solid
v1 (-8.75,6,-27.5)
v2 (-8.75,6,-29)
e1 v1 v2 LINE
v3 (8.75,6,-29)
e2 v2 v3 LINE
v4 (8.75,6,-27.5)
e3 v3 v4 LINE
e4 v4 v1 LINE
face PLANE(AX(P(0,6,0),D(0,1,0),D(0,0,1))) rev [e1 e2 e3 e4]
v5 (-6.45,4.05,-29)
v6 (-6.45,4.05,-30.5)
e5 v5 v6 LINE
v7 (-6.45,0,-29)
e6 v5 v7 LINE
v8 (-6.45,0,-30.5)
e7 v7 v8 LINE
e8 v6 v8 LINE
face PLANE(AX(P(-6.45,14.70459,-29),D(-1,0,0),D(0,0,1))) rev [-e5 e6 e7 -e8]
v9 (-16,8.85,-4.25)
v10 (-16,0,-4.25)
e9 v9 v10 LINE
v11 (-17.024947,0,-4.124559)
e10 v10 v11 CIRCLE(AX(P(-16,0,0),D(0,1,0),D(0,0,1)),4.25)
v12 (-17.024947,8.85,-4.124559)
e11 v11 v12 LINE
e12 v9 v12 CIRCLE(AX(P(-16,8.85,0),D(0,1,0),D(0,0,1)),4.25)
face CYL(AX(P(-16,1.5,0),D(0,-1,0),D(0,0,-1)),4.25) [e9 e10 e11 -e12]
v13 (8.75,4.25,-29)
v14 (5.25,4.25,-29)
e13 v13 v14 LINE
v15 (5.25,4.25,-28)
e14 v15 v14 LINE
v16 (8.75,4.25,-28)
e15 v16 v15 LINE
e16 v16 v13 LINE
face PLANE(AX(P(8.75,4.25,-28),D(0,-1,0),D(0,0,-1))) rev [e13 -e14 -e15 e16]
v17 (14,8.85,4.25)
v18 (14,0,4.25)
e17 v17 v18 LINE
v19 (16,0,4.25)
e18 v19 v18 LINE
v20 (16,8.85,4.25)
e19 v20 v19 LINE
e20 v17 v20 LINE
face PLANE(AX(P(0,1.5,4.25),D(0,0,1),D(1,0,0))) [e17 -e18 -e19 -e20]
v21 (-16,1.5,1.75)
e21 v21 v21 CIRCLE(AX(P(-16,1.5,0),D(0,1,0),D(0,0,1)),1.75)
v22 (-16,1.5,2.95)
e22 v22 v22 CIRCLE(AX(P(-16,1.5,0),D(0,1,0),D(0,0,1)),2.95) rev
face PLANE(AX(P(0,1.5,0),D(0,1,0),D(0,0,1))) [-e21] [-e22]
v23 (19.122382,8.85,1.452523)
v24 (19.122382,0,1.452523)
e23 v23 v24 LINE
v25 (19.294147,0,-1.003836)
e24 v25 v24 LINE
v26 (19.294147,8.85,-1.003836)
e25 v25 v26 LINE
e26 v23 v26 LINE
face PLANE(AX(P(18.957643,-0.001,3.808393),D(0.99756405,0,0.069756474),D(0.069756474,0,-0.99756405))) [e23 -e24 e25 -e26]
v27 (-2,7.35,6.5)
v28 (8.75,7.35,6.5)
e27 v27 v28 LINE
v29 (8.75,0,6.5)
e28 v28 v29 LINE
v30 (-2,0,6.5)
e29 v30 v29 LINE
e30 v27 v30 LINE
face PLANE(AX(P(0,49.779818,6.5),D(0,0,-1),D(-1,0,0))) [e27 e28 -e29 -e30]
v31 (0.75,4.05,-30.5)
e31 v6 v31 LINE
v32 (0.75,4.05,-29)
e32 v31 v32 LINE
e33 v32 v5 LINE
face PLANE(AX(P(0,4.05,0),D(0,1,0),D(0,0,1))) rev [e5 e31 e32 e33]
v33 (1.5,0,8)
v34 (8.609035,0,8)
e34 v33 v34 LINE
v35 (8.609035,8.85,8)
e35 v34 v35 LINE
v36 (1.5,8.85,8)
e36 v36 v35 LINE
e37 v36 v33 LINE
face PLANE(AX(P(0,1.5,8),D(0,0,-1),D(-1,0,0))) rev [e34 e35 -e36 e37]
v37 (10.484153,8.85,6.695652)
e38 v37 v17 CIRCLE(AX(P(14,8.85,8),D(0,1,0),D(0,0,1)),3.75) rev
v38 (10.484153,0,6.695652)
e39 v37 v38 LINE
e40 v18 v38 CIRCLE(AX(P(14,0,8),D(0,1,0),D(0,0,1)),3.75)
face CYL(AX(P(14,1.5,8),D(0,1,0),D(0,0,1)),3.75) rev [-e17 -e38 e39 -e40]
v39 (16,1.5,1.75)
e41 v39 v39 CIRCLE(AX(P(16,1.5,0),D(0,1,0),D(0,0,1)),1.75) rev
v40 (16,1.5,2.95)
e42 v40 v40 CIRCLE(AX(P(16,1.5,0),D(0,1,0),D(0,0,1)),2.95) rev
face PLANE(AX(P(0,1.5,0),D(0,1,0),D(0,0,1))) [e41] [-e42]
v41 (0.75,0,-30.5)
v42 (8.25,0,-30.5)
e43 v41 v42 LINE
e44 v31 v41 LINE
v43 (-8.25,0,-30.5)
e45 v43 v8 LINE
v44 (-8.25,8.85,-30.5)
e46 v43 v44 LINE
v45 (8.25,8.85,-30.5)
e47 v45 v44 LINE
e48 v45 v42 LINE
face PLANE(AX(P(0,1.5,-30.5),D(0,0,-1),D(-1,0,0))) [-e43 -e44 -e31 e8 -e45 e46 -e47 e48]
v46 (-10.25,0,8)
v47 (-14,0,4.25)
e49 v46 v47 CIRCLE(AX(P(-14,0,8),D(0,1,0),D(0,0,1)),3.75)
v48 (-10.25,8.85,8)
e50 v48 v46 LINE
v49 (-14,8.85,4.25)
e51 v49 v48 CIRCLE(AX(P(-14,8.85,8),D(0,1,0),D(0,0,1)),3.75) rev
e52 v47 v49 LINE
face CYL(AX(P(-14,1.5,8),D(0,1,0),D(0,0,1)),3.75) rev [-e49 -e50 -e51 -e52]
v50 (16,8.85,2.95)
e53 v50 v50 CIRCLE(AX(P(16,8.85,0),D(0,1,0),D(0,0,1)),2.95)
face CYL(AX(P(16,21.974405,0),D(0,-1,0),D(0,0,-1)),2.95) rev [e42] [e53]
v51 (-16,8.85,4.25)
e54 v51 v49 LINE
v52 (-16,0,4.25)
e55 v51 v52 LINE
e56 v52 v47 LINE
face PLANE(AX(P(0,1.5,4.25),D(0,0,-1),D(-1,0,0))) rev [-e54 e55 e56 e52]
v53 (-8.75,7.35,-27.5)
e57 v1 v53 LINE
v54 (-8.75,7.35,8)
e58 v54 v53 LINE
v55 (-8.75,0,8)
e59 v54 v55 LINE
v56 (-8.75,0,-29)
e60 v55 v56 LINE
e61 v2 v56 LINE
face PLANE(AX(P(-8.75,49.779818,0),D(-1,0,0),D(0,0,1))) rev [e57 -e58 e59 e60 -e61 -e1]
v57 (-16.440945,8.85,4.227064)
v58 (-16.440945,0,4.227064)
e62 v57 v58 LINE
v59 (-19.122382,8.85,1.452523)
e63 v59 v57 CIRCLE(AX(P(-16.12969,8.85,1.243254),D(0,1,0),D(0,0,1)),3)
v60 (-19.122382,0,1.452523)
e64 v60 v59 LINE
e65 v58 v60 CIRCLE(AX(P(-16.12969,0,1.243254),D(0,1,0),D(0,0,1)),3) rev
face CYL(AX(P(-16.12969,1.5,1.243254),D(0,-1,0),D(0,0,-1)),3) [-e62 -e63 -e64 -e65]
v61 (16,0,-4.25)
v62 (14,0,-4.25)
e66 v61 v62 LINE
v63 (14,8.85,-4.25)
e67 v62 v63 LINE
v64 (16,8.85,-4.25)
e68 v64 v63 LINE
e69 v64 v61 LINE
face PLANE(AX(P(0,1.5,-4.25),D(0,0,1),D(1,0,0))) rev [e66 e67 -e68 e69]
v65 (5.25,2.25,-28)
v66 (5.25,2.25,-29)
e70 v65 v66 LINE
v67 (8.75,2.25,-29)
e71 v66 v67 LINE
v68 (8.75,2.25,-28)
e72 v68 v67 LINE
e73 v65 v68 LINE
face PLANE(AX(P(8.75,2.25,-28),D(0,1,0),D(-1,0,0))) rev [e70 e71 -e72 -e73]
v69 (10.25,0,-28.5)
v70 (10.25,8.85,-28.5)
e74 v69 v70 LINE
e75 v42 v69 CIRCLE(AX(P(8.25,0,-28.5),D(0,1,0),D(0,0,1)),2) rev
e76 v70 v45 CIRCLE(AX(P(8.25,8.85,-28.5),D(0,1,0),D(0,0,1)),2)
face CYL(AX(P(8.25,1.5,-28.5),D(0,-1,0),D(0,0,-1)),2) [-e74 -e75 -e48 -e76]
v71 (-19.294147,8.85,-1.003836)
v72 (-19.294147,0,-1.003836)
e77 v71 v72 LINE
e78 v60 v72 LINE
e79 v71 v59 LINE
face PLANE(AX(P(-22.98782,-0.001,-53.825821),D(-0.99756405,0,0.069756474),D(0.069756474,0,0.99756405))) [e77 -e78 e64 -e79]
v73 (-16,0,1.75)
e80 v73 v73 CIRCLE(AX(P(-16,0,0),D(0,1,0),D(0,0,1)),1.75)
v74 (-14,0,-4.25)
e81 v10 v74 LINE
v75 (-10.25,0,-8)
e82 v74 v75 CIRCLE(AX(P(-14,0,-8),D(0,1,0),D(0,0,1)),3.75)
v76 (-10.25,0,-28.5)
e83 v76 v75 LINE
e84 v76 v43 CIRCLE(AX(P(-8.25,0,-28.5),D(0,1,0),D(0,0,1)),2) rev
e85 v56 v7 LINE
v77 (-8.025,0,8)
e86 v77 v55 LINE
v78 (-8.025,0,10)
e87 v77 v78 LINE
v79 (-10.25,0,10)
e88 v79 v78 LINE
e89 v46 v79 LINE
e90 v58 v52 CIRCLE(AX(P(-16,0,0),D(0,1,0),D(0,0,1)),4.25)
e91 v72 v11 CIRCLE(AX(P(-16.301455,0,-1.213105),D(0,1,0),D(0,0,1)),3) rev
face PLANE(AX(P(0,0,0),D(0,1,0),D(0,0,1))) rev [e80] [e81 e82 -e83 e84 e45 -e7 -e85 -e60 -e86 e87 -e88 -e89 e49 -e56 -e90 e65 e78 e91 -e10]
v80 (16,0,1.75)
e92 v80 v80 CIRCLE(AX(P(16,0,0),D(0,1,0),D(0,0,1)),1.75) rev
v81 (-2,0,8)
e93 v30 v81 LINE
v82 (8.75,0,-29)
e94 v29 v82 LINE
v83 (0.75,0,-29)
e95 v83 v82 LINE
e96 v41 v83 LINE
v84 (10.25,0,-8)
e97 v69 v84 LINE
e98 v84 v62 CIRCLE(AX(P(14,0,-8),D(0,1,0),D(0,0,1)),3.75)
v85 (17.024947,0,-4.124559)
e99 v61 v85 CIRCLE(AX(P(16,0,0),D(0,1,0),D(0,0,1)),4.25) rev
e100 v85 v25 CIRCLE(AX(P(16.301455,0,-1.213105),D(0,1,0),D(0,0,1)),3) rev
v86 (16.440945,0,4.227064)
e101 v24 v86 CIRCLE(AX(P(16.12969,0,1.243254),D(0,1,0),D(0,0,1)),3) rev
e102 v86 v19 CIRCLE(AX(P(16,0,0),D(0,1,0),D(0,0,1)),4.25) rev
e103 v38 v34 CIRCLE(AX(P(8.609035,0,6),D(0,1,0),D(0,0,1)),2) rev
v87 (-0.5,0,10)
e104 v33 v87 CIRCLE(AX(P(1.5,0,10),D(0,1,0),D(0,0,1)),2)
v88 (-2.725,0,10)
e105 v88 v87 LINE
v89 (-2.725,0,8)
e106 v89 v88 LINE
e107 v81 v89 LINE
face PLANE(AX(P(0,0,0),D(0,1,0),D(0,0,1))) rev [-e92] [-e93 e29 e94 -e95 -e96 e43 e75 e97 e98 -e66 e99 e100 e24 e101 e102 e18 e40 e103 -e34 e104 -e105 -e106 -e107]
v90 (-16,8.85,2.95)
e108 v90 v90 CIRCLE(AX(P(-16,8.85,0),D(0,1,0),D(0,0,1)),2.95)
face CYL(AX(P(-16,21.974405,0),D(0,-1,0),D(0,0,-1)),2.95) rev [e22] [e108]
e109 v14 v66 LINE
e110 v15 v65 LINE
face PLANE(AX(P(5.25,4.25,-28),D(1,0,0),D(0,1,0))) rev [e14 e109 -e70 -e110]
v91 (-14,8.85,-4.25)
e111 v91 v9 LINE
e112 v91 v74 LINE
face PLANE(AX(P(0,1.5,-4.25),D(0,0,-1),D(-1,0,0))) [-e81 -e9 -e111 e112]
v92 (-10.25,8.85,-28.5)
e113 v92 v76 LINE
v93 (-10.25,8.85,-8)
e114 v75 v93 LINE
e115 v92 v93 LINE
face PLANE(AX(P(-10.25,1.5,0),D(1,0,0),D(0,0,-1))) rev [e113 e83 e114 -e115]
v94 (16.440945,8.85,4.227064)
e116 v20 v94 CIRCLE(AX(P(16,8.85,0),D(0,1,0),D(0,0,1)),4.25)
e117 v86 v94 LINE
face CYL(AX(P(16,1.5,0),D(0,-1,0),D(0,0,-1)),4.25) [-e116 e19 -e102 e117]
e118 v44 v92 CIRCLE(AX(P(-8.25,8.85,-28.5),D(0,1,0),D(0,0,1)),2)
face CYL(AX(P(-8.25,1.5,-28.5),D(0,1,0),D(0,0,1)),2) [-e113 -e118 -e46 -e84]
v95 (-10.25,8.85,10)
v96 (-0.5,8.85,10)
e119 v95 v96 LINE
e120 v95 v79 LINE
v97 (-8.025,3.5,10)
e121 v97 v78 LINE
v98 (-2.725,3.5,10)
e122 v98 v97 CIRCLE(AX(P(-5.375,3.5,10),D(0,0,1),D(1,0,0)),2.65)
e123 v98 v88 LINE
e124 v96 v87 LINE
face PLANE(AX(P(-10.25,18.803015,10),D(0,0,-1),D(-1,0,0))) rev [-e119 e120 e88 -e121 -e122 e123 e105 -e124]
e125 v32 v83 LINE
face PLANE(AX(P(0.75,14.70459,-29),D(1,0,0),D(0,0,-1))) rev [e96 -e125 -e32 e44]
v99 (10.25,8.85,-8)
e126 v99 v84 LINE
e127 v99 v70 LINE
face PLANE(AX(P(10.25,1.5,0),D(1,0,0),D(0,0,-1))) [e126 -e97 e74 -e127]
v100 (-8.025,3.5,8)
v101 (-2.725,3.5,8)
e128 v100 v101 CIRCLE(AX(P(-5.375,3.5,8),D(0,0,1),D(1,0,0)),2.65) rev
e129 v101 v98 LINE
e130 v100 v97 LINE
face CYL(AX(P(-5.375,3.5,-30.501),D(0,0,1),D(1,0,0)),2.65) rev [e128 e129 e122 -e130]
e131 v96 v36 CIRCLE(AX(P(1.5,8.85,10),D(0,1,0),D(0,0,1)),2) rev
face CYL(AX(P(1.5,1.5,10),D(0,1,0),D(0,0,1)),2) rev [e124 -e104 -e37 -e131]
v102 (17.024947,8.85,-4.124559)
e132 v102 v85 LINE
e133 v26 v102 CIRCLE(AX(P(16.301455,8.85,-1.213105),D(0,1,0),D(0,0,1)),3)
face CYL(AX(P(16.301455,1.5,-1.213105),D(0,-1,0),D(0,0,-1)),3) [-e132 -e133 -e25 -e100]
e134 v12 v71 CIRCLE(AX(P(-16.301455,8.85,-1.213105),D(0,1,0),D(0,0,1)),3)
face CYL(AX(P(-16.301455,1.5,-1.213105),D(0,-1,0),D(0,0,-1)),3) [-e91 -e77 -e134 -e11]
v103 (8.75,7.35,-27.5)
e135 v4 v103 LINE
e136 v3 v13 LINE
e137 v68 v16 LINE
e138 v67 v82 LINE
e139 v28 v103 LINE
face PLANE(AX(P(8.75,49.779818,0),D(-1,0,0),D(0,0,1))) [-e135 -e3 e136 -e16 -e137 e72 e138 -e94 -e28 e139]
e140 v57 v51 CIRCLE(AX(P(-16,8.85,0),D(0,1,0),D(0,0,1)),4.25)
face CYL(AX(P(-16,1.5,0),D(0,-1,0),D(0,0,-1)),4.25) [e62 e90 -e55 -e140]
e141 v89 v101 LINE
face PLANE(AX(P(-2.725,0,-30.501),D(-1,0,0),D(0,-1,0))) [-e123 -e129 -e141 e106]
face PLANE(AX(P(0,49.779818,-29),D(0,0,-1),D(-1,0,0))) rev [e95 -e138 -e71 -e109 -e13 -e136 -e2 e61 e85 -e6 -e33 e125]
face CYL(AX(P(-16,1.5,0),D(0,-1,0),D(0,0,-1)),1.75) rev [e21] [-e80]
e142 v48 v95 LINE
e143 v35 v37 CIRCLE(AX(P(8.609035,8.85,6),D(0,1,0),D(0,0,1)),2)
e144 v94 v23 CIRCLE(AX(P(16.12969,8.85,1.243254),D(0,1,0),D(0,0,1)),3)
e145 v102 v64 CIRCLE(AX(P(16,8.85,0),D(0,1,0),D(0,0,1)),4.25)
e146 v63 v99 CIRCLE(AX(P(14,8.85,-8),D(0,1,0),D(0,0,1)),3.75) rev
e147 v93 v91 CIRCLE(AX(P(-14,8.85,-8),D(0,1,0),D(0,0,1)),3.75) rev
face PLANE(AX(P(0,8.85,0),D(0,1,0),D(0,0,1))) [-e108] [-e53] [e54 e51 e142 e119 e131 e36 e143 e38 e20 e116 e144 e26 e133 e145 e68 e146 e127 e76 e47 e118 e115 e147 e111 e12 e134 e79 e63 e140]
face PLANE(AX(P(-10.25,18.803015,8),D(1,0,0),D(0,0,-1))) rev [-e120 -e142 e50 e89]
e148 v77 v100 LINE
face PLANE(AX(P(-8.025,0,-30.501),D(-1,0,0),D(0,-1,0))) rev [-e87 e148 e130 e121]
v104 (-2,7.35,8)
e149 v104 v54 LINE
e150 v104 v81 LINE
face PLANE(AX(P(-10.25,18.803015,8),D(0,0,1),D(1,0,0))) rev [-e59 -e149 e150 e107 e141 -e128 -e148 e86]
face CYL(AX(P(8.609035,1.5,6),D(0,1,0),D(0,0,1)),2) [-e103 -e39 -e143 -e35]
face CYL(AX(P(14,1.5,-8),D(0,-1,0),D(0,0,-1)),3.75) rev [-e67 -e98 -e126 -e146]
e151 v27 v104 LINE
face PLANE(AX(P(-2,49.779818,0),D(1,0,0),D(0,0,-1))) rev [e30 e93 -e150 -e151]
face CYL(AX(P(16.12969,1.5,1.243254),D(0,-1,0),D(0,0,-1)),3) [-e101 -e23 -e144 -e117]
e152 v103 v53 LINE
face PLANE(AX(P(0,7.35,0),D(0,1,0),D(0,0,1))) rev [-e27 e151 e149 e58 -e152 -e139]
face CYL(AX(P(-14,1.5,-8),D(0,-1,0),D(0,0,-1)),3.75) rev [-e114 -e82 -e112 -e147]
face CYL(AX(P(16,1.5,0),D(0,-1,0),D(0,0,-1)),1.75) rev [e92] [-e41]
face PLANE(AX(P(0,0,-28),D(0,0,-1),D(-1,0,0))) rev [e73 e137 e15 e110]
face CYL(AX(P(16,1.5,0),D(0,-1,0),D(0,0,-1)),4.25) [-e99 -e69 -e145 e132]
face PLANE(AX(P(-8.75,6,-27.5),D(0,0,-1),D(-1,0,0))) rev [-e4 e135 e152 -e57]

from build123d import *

# Parameters (mm, degrees)
SKETCH1_W           = 20.5
SKETCH1_H           = 38.5
SKETCH1_R           = 4.25
SKETCH1_R_2         = 1.75
BOSS_EXTRUDE1_DEPTH = 1.5
SKETCH2_W           = 20.5
SKETCH2_H           = 38.5
BOSS_EXTRUDE2_DEPTH = 7.35
SKETCH3_W           = 17.5
SKETCH3_H           = 35.5
SKETCH3_W_2         = 6.75
SKETCH3_H_2         = 1.5
CUT_EXTRUDE1_DEPTH  = 7.35
SKETCH4_W           = 7.2
SKETCH4_H           = 1.5
CUT_EXTRUDE2_DEPTH  = 4.05
SKETCH6_W           = 17.5
SKETCH6_H           = 1.5
BOSS_EXTRUDE3_DEPTH = 1.35
SKETCH7_W           = 3.5
SKETCH7_H           = 2
BOSS_EXTRUDE4_DEPTH = 1
SKETCH8_R           = 2.95
BOSS_EXTRUDE5_DEPTH = 7.35
FILLET2_R           = 3.75
CUT_EXTRUDE4_START  = -8.85
CUT_EXTRUDE4_DEPTH  = 8.85
FILLET5_R           = 3
SKETCH10_W          = 9.75
SKETCH10_H          = 2
BOSS_EXTRUDE6_DEPTH = 8.85
CUT_EXTRUDE5_REACH  = 47.729
FILLET4_R           = 2


with BuildPart() as part:
    # Sketch1 → Boss-Extrude1 (new body)
    # profile 1 of 5: a face of its own
    with BuildSketch(Plane(origin=(0, 0, 0), x_dir=(1, 0, 0), z_dir=(0, 1, 0))):
        with Locations((0, 11.25)):
            Rectangle(SKETCH1_W, SKETCH1_H)
    # profile 2 of 5: a face of its own
    with BuildSketch(Plane(origin=(0, 0, 0), x_dir=(1, 0, 0), z_dir=(0, 1, 0))):
        with BuildLine():
            Line((-10.25, -4.25), (-10.25, 4.25))
            Line((-10.25, 4.25), (-16, 4.25))
            ThreePointArc((-16, 4.25), (-12.99479618, 3.00520382), (-11.75, 0))
            ThreePointArc((-11.75, 0), (-12.99479618, -3.00520382), (-16, -4.25))
            Line((-16, -4.25), (-10.25, -4.25))
        make_face()
    # profile 3 of 5: a face of its own
    with BuildSketch(Plane(origin=(0, 0, 0), x_dir=(1, 0, 0), z_dir=(0, 1, 0))):
        with Locations((-16, 0)):
            Circle(SKETCH1_R)
        with Locations(Location((-16, 0, 0), (0, 0, 270))):
            Circle(SKETCH1_R_2, mode=Mode.SUBTRACT)
    # profile 4 of 5: a face of its own
    with BuildSketch(Plane(origin=(0, 0, 0), x_dir=(1, 0, 0), z_dir=(0, 1, 0))):
        with BuildLine():
            Line((16, 4.25), (10.25, 4.25))
            Line((10.25, 4.25), (10.25, -4.25))
            Line((10.25, -4.25), (16, -4.25))
            ThreePointArc((16, -4.25), (11.75, 0), (16, 4.25))
        make_face()
    # profile 5 of 5: a face of its own
    with BuildSketch(Plane(origin=(0, 0, 0), x_dir=(1, 0, 0), z_dir=(0, 1, 0))):
        with Locations((16, 0)):
            Circle(SKETCH1_R)
        with Locations(Location((16, 0, 0), (0, 0, 270))):
            Circle(SKETCH1_R_2, mode=Mode.SUBTRACT)
    extrude(amount=BOSS_EXTRUDE1_DEPTH)

    # Sketch2 → Boss-Extrude2 (add)
    with BuildSketch(Plane(origin=(0, 1.5, 0), x_dir=(1, 0, 0), z_dir=(0, 1, 0))):
        with Locations((0, 11.25)):
            Rectangle(SKETCH2_W, SKETCH2_H)
    extrude(amount=BOSS_EXTRUDE2_DEPTH)

    # Sketch3 → Cut-Extrude1 (cut)
    with BuildSketch(Plane.XZ):
        with Locations((0, -11.25)):
            Rectangle(SKETCH3_W, SKETCH3_H)
        with Locations((-5.375, 7.25)):
            Rectangle(SKETCH3_W_2, SKETCH3_H_2)
    extrude(amount=-CUT_EXTRUDE1_DEPTH, mode=Mode.SUBTRACT)

    # Sketch4 → Cut-Extrude2 (cut)
    with BuildSketch(Plane.XZ):
        with Locations((-2.85, -29.75)):
            Rectangle(SKETCH4_W, SKETCH4_H)
    extrude(amount=-CUT_EXTRUDE2_DEPTH, mode=Mode.SUBTRACT)

    # Sketch6 → Boss-Extrude3 (add)
    with BuildSketch(Plane.XZ.offset(-7.35)):
        with Locations((0, -28.25)):
            Rectangle(SKETCH6_W, SKETCH6_H)
    extrude(amount=BOSS_EXTRUDE3_DEPTH)

    # Sketch7 → Boss-Extrude4 (add)
    with BuildSketch(Plane.XY.offset(-29)):
        with Locations((7, 3.25)):
            Rectangle(SKETCH7_W, SKETCH7_H)
    extrude(amount=BOSS_EXTRUDE4_DEPTH)

    # Sketch8 → Boss-Extrude5 (add)
    # profile 1 of 2: a face of its own
    with BuildSketch(Plane(origin=(0, 1.5, 0), x_dir=(1, 0, 0), z_dir=(0, 1, 0))):
        with BuildLine():
            Line((-10.25, -4.25), (-10.25, 4.25))
            Line((-10.25, 4.25), (-16, 4.25))
            ThreePointArc((-16, 4.25), (-20.25, 0), (-16, -4.25))
            Line((-16, -4.25), (-10.25, -4.25))
        make_face()
        with Locations(Location((-16, 0, 0), (0, 0, 270))):
            Circle(SKETCH8_R, mode=Mode.SUBTRACT)
    # profile 2 of 2: a face of its own
    with BuildSketch(Plane(origin=(0, 1.5, 0), x_dir=(1, 0, 0), z_dir=(0, 1, 0))):
        with BuildLine():
            Line((10.25, 4.25), (10.25, -4.25))
            Line((10.25, -4.25), (16, -4.25))
            ThreePointArc((16, -4.25), (20.25, 0), (16, 4.25))
            Line((16, 4.25), (10.25, 4.25))
        make_face()
        with Locations(Location((16, 0, 0), (0, 0, 270))):
            Circle(SKETCH8_R, mode=Mode.SUBTRACT)
    extrude(amount=BOSS_EXTRUDE5_DEPTH)

    # Fillet2
    fillet2_edges = [part.edges().sort_by_distance(p)[0] for p in [
        (10.25, 4.425, -4.25),
        (10.25, 4.425, 4.25),
        (-10.25, 4.425, 4.25),
        (-10.25, 4.425, -4.25),
    ]]
    fillet(fillet2_edges, radius=FILLET2_R - 0.0001)  # a hair under: the kernel refuses the full size

    # Sketch9 → Cut-Extrude4 (cut)
    with BuildSketch(Plane(origin=(0, 8.85, 0), x_dir=(1, 0, 0), z_dir=(0, 1, 0)).offset(CUT_EXTRUDE4_START)):
        with BuildLine():
            Line((-24.982948352, 53.686308531), (-20.952771504, -3.947905519))
            ThreePointArc((-20.952771504, -3.947905519), (-19.171836931, -8.143524448), (-15.185360396, -10.353264474))
            Line((-15.185360396, -10.353264474), (-1.215537244, -12.816521212))
            ThreePointArc((-1.215537244, -12.816521212), (0, -12.922866941), (1.215537244, -12.816521212))
            Line((1.215537244, -12.816521212), (15.185360396, -10.353264474))
            ThreePointArc((15.185360396, -10.353264474), (19.171836931, -8.143524448), (20.952771504, -3.947905519))
            Line((20.952771504, -3.947905519), (24.982948352, 53.686308531))
            ThreePointArc((24.982948352, 53.686308531), (24.995735789, 53.930307371), (25, 54.174603847))
            Line((25, 54.174603847), (25, 107.825396153))
            ThreePointArc((25, 107.825396153), (24.995735789, 108.069692629), (24.982948352, 108.313691469))
            Line((24.982948352, 108.313691469), (20.952771504, 165.947905519))
            ThreePointArc((20.952771504, 165.947905519), (19.171836931, 170.143524448), (15.185360396, 172.353264474))
            Line((15.185360396, 172.353264474), (1.215537244, 174.816521212))
            ThreePointArc((1.215537244, 174.816521212), (0, 174.922866941), (-1.215537244, 174.816521212))
            Line((-1.215537244, 174.816521212), (-15.185360396, 172.353264474))
            ThreePointArc((-15.185360396, 172.353264474), (-19.171836931, 170.143524448), (-20.952771504, 165.947905519))
            Line((-20.952771504, 165.947905519), (-24.982948352, 108.313691469))
            ThreePointArc((-24.982948352, 108.313691469), (-24.995735789, 108.069692629), (-25, 107.825396153))
            Line((-25, 107.825396153), (-25, 54.174603847))
            ThreePointArc((-25, 54.174603847), (-24.995735789, 53.930307371), (-24.982948352, 53.686308531))
        make_face()
        with BuildLine():
            Line((-18.957643404, 165.808392572), (-22.987820251, 108.174178521))
            ThreePointArc((-22.987820251, 108.174178521), (-22.996954135, 107.999893636), (-23, 107.825396153))
            Line((-23, 107.825396153), (-23, 54.174603847))
            ThreePointArc((-23, 54.174603847), (-22.996954135, 54.000106364), (-22.987820251, 53.825821479))
            Line((-22.987820251, 53.825821479), (-18.957643404, -3.808392572))
            ThreePointArc((-18.957643404, -3.808392572), (-17.68554728, -6.805263235), (-14.838064041, -8.383648968))
            Line((-14.838064041, -8.383648968), (-0.868240888, -10.846905706))
            ThreePointArc((-0.868240888, -10.846905706), (0, -10.922866941), (0.868240888, -10.846905706))
            Line((0.868240888, -10.846905706), (14.838064041, -8.383648968))
            ThreePointArc((14.838064041, -8.383648968), (17.68554728, -6.805263235), (18.957643404, -3.808392572))
            Line((18.957643404, -3.808392572), (22.987820251, 53.825821479))
            ThreePointArc((22.987820251, 53.825821479), (22.996954135, 54.000106364), (23, 54.174603847))
            Line((23, 54.174603847), (23, 107.825396153))
            ThreePointArc((23, 107.825396153), (22.996954135, 107.999893636), (22.987820251, 108.174178521))
            Line((22.987820251, 108.174178521), (18.957643404, 165.808392572))
            ThreePointArc((18.957643404, 165.808392572), (17.68554728, 168.805263235), (14.838064041, 170.383648968))
            Line((14.838064041, 170.383648968), (0.868240888, 172.846905706))
            ThreePointArc((0.868240888, 172.846905706), (0, 172.922866941), (-0.868240888, 172.846905706))
            Line((-0.868240888, 172.846905706), (-14.838064041, 170.383648968))
            ThreePointArc((-14.838064041, 170.383648968), (-17.68554728, 168.805263235), (-18.957643404, 165.808392572))
        make_face(mode=Mode.SUBTRACT)
    extrude(amount=CUT_EXTRUDE4_DEPTH, mode=Mode.SUBTRACT)

    # Fillet5
    fillet5_edges = [part.edges().sort_by_distance(p)[0] for p in [
        (-19.402072162, 4.425, -2.547234776),
        (-19.014456867, 4.425, 2.995922195),
        (19.014456867, 4.425, 2.995922195),
        (19.402072162, 4.425, -2.547234776),
    ]]
    fillet(fillet5_edges, radius=FILLET5_R)

    # Sketch10 → Boss-Extrude6 (add)
    with BuildSketch(Plane(origin=(0, 0, 0), x_dir=(1, 0, 0), z_dir=(0, 1, 0))):
        with Locations((-5.375, -9)):
            Rectangle(SKETCH10_W, SKETCH10_H)
    extrude(amount=BOSS_EXTRUDE6_DEPTH)

    # Sketch11 → Cut-Extrude5 (cut, up to next)
    with BuildSketch(Plane.XY.offset(10), mode=Mode.PRIVATE) as cut_extrude5_sk1:
        with BuildLine():
            ThreePointArc((-2.725, 3.5), (-3.50116703, 5.37383297), (-5.375, 6.15))
            Line((-5.375, 6.15), (-5.375, 0.85))
            ThreePointArc((-5.375, 0.85), (-3.50116703, 1.62616703), (-2.725, 3.5))
        make_face()
    cut_extrude5_tool1 = extrude(cut_extrude5_sk1.sketch, amount=-CUT_EXTRUDE5_REACH, mode=Mode.PRIVATE) & part.part
    # Sketch11 → Cut-Extrude5 (cut, up to next)
    with BuildSketch(Plane.XY.offset(10), mode=Mode.PRIVATE) as cut_extrude5_sk2:
        with BuildLine():
            Line((-5.375, 0.85), (-5.375, 6.15))
            ThreePointArc((-5.375, 6.15), (-7.24883297, 5.37383297), (-8.025, 3.5))
            ThreePointArc((-8.025, 3.5), (-7.24883297, 1.62616703), (-5.375, 0.85))
        make_face()
    cut_extrude5_tool2 = extrude(cut_extrude5_sk2.sketch, amount=-CUT_EXTRUDE5_REACH, mode=Mode.PRIVATE) & part.part
    # Sketch11 → Cut-Extrude5 (cut, up to next)
    with BuildSketch(Plane.XY.offset(10), mode=Mode.PRIVATE) as cut_extrude5_sk3:
        with BuildLine():
            ThreePointArc((-2.725, 3.5), (-3.50116703, 5.37383297), (-5.375, 6.15))
            Line((-5.375, 6.15), (-5.375, 0.85))
            ThreePointArc((-5.375, 0.85), (-3.50116703, 1.62616703), (-2.725, 3.5))
        make_face()
    cut_extrude5_tool3 = extrude(cut_extrude5_sk3.sketch, amount=-CUT_EXTRUDE5_REACH, mode=Mode.PRIVATE) & part.part
    # Sketch11 → Cut-Extrude5 (cut, up to next)
    with BuildSketch(Plane.XY.offset(10), mode=Mode.PRIVATE) as cut_extrude5_sk4:
        with BuildLine():
            Line((-5.375, 0.85), (-5.375, 6.15))
            ThreePointArc((-5.375, 6.15), (-7.24883297, 5.37383297), (-8.025, 3.5))
            ThreePointArc((-8.025, 3.5), (-7.24883297, 1.62616703), (-5.375, 0.85))
        make_face()
    cut_extrude5_tool4 = extrude(cut_extrude5_sk4.sketch, amount=-CUT_EXTRUDE5_REACH, mode=Mode.PRIVATE) & part.part
    # Sketch11 → Cut-Extrude5 (cut, up to next)
    with BuildSketch(Plane.XY.offset(10), mode=Mode.PRIVATE) as cut_extrude5_sk5:
        with BuildLine():
            Line((-5.375, 0), (-5.375, 0.85))
            ThreePointArc((-5.375, 0.85), (-7.24883297, 1.62616703), (-8.025, 3.5))
            Line((-8.025, 3.5), (-8.025, 0))
            Line((-8.025, 0), (-5.375, 0))
        make_face()
    cut_extrude5_tool5 = extrude(cut_extrude5_sk5.sketch, amount=-CUT_EXTRUDE5_REACH, mode=Mode.PRIVATE) & part.part
    # Sketch11 → Cut-Extrude5 (cut, up to next)
    with BuildSketch(Plane.XY.offset(10), mode=Mode.PRIVATE) as cut_extrude5_sk6:
        with BuildLine():
            ThreePointArc((-2.725, 3.5), (-3.50116703, 1.62616703), (-5.375, 0.85))
            Line((-5.375, 0.85), (-5.375, 0))
            Line((-5.375, 0), (-2.725, 0))
            Line((-2.725, 0), (-2.725, 3.5))
        make_face()
    cut_extrude5_tool6 = extrude(cut_extrude5_sk6.sketch, amount=-CUT_EXTRUDE5_REACH, mode=Mode.PRIVATE) & part.part
    add(cut_extrude5_tool1.solids().sort_by_distance((-4.250305, 3.5, 10))[0], mode=Mode.SUBTRACT)
    add(cut_extrude5_tool2.solids().sort_by_distance((-6.499695, 3.5, 10))[0], mode=Mode.SUBTRACT)
    add(cut_extrude5_tool3.solids().sort_by_distance((-4.250305, 3.5, 10))[0], mode=Mode.SUBTRACT)
    add(cut_extrude5_tool4.solids().sort_by_distance((-6.499695, 3.5, 10))[0], mode=Mode.SUBTRACT)
    add(cut_extrude5_tool5.solids().sort_by_distance((-6.993859, 0.832642, 10))[0], mode=Mode.SUBTRACT)
    add(cut_extrude5_tool6.solids().sort_by_distance((-3.756141, 0.832642, 10))[0], mode=Mode.SUBTRACT)

    # Fillet4
    fillet4_edges = [part.edges().sort_by_distance(p)[0] for p in [
        (10.25, 4.425, 8),
        (10.25, 4.425, -30.5),
        (-10.25, 4.425, -30.5),
        (-0.5, 4.425, 8),
    ]]
    fillet(fillet4_edges, radius=FILLET4_R - 0.0001)  # a hair under: the kernel refuses the full size


solid = part.part
